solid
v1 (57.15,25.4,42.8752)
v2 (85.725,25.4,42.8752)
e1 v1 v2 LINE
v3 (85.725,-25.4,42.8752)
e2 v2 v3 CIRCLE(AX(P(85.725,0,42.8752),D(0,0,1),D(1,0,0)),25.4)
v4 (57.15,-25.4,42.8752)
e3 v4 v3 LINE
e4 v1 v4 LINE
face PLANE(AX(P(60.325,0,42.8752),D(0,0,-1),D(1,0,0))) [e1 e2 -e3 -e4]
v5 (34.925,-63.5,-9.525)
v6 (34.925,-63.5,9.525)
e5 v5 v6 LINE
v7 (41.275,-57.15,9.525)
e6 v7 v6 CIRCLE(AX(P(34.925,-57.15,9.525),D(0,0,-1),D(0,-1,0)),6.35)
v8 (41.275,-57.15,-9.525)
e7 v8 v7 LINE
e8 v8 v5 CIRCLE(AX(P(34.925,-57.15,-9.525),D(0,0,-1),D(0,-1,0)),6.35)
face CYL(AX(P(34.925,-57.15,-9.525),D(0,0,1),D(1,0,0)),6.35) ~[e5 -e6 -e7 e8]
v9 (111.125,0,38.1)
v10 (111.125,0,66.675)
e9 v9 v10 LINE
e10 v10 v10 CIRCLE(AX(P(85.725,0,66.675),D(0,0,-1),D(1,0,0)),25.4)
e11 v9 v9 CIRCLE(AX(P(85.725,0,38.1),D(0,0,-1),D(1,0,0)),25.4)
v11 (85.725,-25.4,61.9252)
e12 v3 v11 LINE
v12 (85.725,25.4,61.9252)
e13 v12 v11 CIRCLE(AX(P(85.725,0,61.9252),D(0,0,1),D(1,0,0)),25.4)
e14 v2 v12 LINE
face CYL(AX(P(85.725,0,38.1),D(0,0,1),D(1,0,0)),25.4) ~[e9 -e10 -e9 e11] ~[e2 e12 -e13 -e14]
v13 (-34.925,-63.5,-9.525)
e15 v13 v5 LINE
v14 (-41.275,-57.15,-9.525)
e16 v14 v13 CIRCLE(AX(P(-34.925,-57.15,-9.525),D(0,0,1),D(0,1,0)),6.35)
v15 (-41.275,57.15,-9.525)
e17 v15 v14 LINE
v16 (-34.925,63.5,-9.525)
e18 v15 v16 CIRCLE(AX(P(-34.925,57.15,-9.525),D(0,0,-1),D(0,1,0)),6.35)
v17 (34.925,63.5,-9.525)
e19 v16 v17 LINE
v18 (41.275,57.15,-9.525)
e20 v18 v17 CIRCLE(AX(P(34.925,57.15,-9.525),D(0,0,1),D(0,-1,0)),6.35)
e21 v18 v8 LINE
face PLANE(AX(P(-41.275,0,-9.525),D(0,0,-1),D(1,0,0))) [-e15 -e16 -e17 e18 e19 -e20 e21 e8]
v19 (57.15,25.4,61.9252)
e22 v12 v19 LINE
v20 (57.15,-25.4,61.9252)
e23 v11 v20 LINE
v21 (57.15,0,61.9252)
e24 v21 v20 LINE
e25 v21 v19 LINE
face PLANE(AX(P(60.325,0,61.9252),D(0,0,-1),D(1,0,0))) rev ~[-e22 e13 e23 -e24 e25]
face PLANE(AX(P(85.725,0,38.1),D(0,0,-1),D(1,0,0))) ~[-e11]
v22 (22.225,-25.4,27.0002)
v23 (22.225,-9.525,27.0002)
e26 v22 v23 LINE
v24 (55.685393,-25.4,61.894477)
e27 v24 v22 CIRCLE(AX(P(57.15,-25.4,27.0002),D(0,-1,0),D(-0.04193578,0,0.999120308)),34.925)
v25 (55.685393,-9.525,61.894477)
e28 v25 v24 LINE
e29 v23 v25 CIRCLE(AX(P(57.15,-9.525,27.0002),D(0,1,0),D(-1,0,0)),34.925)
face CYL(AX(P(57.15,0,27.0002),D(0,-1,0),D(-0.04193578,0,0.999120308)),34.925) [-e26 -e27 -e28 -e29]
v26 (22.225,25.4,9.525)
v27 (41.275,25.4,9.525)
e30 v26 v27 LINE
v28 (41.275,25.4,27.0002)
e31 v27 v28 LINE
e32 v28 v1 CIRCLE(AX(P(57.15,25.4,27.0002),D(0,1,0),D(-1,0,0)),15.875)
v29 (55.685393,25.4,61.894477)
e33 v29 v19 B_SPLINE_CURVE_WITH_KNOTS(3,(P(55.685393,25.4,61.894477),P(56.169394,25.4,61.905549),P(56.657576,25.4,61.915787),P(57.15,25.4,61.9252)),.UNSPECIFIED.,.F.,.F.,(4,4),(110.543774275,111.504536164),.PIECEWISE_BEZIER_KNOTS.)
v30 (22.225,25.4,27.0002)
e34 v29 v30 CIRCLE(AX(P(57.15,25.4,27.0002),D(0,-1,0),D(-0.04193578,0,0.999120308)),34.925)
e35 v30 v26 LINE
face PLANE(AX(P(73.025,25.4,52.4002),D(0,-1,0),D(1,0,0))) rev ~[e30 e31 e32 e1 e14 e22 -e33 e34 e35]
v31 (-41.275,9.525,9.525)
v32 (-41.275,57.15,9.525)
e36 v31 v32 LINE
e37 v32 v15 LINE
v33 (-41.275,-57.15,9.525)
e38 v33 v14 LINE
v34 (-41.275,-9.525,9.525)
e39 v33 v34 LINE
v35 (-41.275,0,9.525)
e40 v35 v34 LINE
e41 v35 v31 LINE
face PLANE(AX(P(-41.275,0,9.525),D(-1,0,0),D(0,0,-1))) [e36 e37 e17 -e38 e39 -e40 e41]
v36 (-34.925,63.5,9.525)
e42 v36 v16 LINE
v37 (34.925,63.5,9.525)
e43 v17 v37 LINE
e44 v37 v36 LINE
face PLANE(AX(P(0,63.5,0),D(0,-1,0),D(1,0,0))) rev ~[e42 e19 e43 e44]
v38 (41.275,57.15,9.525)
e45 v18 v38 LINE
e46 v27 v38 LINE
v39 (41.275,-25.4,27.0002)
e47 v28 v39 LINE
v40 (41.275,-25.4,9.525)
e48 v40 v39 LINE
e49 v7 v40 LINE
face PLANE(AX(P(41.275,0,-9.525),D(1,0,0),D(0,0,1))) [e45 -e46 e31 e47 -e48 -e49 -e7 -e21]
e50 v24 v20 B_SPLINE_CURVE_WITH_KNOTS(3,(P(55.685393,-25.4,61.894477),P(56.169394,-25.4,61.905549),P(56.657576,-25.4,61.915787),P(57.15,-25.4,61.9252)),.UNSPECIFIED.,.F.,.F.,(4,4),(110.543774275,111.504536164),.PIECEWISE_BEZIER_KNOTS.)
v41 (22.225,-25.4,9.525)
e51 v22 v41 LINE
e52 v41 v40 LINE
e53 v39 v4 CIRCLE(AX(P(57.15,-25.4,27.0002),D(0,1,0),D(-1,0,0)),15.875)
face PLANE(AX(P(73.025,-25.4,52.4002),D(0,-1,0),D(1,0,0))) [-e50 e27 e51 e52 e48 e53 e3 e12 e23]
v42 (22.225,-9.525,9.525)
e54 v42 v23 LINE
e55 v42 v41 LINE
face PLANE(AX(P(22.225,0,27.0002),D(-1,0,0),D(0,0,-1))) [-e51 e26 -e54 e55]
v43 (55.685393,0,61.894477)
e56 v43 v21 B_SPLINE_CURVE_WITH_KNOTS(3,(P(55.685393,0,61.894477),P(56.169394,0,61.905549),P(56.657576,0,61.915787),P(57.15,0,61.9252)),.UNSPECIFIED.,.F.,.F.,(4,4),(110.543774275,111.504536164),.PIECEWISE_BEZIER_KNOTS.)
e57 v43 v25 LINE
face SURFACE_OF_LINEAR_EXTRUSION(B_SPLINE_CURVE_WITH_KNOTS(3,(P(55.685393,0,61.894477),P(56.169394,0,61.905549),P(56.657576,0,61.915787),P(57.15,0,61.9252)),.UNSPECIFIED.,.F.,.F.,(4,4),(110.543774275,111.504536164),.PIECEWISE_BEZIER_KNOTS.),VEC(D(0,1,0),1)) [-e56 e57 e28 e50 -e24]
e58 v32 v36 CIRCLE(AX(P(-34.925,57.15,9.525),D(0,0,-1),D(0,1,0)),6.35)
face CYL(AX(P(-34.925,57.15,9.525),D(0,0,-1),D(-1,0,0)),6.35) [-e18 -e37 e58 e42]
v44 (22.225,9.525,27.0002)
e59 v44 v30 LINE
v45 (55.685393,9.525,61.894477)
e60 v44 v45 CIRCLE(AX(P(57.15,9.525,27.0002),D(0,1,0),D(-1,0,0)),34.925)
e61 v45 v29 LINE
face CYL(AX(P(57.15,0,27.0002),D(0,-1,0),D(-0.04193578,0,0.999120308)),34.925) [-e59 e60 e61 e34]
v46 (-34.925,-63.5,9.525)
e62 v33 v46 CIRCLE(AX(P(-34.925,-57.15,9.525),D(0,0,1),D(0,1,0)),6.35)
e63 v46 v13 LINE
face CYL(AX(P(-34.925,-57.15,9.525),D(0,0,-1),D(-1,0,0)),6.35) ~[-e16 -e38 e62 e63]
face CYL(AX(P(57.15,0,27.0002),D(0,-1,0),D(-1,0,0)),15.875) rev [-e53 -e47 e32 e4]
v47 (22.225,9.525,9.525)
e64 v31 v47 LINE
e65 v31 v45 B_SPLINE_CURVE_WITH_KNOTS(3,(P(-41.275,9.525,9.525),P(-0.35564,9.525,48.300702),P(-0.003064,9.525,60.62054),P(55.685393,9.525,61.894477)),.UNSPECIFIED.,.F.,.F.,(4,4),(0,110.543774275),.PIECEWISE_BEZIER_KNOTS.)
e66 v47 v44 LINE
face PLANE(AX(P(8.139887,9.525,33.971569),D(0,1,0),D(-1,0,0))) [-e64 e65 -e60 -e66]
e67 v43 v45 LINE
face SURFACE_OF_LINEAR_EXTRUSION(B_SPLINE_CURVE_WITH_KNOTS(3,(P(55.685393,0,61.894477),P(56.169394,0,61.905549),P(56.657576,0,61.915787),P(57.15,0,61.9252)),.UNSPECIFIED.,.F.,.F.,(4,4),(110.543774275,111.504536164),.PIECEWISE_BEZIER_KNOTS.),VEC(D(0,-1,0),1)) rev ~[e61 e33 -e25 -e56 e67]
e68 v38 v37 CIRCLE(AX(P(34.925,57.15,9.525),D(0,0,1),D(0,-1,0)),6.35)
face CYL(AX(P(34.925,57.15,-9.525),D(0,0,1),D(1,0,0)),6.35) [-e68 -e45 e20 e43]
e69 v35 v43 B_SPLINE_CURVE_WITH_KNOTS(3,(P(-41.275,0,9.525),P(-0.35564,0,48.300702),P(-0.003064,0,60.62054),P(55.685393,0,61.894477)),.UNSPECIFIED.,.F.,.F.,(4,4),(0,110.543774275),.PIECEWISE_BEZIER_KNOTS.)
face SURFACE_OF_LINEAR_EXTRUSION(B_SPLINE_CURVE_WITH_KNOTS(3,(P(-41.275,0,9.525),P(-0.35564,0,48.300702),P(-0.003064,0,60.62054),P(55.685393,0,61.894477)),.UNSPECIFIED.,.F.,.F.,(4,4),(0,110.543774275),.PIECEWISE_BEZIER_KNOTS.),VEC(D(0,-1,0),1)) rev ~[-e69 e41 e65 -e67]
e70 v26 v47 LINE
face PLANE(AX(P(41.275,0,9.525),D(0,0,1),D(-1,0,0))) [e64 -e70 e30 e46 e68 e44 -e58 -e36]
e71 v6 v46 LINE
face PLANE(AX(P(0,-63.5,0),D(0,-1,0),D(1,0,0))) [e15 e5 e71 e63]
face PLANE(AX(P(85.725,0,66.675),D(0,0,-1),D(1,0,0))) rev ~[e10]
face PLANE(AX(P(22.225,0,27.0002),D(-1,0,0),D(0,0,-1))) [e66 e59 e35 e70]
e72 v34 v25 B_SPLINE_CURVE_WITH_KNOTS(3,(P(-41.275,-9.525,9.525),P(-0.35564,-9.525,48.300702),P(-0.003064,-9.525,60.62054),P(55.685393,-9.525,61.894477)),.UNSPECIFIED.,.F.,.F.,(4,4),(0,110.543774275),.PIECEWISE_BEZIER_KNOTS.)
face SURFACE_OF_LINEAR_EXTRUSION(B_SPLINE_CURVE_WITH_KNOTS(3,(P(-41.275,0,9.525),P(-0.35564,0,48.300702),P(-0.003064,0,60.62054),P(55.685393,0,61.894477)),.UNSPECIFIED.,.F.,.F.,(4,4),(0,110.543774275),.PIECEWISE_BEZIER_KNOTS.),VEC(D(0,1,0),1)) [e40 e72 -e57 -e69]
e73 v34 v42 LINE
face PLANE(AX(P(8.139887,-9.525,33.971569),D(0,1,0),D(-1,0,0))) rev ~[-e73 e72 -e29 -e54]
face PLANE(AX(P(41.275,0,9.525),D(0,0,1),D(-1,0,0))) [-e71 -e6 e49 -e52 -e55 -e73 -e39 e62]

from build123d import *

# Parameters (mm, degrees)
F1_DEPTH = 63.5
F2_DEPTH = 25.4
F3_DEPTH = 9.525
F0_W     = 25.4
F0_H     = 19.05
F4_DEPTH = 25.4
F6_R     = 6.35


# Not quite as in the source:
# - a feature names something its author has since deleted; it is built from what else it names


with BuildPart() as f1:
    # F0 (on Front) → F1 (new body, symmetric)
    with BuildSketch(Plane.XZ):
        Polygon((22.225, 9.525), (-41.275, 9.525), (-41.275, -9.525), (41.275, -9.525), (41.275, 9.525), align=None)
    extrude(amount=F1_DEPTH, both=True)

    # F0 (on Front) → F2 (join, symmetric)
    with BuildSketch(Plane.XZ):
        with BuildLine():
            Line((22.225, 27.0002), (22.225, 9.525))
            Line((22.225, 9.525), (41.275, 9.525))
            Line((41.275, 9.525), (41.275, 27.0002))
            ThreePointArc((41.275, 27.0002), (45.9246798487, 38.2255201513), (57.15, 42.8752))
            Line((57.15, 42.8752), (60.325, 42.8752))
            Line((60.325, 42.8752), (60.325, 61.9252))
            Line((60.325, 61.9252), (57.15, 61.9252))
            add(Edge.make_bspline(
                [(55.6853928695, 61.894476765), (56.1693943217, 61.9055488515), (56.6575757113, 61.9157865575), (57.15, 61.9252)],
                knots=[110.5437742754, 110.5437742754, 110.5437742754, 110.5437742754, 111.5045361635, 111.5045361635, 111.5045361635, 111.5045361635], degree=3))
            ThreePointArc((55.6853928695, 61.894476765), (31.9417966821, 51.1725418494), (22.225, 27.0002))
        make_face()
    extrude(amount=F2_DEPTH, both=True)

    # F0 (on Front) → F3 (join, symmetric)
    with BuildSketch(Plane.XZ):
        with BuildLine():
            add(Edge.make_bspline(
                [(-41.275, 9.525), (-0.3556397641, 48.3007017864), (-0.003064316, 60.620539654), (55.6853928695, 61.894476765)],
                knots=[0, 0, 0, 0, 110.5437742754, 110.5437742754, 110.5437742754, 110.5437742754], degree=3))
            Line((-41.275, 9.525), (22.225, 9.525))
            Line((22.225, 9.525), (22.225, 27.0002))
            ThreePointArc((22.225, 27.0002), (31.9417966821, 51.1725418494), (55.6853928695, 61.894476765))
        make_face()
    extrude(amount=F3_DEPTH, both=True)

    # F0 (on Front) → F4 (join, symmetric)
    with BuildSketch(Plane.XZ):
        with Locations((73.025, 52.4002)):
            Rectangle(F0_W, F0_H)
    extrude(amount=F4_DEPTH, both=True)

    # F0 (on Front) → F5 (revolve)
    with BuildSketch(Plane.XZ):
        Polygon((85.725, 66.675), (85.725, 61.9252), (85.725, 42.8752), (85.725, 38.1), (111.125, 38.1), (111.125, 66.675), align=None)
    revolve(axis=Axis((85.725, 0, 52.3875), (0, 0, -1)))

    # F6
    f6_edges = [f1.edges().sort_by_distance(p)[0] for p in [
        (41.275, -63.5, 0),
        (-41.275, -63.5, 0),
        (41.275, 63.5, 0),
        (-41.275, 63.5, 0),
    ]]
    fillet(f6_edges, radius=F6_R)


solid = f1.part
